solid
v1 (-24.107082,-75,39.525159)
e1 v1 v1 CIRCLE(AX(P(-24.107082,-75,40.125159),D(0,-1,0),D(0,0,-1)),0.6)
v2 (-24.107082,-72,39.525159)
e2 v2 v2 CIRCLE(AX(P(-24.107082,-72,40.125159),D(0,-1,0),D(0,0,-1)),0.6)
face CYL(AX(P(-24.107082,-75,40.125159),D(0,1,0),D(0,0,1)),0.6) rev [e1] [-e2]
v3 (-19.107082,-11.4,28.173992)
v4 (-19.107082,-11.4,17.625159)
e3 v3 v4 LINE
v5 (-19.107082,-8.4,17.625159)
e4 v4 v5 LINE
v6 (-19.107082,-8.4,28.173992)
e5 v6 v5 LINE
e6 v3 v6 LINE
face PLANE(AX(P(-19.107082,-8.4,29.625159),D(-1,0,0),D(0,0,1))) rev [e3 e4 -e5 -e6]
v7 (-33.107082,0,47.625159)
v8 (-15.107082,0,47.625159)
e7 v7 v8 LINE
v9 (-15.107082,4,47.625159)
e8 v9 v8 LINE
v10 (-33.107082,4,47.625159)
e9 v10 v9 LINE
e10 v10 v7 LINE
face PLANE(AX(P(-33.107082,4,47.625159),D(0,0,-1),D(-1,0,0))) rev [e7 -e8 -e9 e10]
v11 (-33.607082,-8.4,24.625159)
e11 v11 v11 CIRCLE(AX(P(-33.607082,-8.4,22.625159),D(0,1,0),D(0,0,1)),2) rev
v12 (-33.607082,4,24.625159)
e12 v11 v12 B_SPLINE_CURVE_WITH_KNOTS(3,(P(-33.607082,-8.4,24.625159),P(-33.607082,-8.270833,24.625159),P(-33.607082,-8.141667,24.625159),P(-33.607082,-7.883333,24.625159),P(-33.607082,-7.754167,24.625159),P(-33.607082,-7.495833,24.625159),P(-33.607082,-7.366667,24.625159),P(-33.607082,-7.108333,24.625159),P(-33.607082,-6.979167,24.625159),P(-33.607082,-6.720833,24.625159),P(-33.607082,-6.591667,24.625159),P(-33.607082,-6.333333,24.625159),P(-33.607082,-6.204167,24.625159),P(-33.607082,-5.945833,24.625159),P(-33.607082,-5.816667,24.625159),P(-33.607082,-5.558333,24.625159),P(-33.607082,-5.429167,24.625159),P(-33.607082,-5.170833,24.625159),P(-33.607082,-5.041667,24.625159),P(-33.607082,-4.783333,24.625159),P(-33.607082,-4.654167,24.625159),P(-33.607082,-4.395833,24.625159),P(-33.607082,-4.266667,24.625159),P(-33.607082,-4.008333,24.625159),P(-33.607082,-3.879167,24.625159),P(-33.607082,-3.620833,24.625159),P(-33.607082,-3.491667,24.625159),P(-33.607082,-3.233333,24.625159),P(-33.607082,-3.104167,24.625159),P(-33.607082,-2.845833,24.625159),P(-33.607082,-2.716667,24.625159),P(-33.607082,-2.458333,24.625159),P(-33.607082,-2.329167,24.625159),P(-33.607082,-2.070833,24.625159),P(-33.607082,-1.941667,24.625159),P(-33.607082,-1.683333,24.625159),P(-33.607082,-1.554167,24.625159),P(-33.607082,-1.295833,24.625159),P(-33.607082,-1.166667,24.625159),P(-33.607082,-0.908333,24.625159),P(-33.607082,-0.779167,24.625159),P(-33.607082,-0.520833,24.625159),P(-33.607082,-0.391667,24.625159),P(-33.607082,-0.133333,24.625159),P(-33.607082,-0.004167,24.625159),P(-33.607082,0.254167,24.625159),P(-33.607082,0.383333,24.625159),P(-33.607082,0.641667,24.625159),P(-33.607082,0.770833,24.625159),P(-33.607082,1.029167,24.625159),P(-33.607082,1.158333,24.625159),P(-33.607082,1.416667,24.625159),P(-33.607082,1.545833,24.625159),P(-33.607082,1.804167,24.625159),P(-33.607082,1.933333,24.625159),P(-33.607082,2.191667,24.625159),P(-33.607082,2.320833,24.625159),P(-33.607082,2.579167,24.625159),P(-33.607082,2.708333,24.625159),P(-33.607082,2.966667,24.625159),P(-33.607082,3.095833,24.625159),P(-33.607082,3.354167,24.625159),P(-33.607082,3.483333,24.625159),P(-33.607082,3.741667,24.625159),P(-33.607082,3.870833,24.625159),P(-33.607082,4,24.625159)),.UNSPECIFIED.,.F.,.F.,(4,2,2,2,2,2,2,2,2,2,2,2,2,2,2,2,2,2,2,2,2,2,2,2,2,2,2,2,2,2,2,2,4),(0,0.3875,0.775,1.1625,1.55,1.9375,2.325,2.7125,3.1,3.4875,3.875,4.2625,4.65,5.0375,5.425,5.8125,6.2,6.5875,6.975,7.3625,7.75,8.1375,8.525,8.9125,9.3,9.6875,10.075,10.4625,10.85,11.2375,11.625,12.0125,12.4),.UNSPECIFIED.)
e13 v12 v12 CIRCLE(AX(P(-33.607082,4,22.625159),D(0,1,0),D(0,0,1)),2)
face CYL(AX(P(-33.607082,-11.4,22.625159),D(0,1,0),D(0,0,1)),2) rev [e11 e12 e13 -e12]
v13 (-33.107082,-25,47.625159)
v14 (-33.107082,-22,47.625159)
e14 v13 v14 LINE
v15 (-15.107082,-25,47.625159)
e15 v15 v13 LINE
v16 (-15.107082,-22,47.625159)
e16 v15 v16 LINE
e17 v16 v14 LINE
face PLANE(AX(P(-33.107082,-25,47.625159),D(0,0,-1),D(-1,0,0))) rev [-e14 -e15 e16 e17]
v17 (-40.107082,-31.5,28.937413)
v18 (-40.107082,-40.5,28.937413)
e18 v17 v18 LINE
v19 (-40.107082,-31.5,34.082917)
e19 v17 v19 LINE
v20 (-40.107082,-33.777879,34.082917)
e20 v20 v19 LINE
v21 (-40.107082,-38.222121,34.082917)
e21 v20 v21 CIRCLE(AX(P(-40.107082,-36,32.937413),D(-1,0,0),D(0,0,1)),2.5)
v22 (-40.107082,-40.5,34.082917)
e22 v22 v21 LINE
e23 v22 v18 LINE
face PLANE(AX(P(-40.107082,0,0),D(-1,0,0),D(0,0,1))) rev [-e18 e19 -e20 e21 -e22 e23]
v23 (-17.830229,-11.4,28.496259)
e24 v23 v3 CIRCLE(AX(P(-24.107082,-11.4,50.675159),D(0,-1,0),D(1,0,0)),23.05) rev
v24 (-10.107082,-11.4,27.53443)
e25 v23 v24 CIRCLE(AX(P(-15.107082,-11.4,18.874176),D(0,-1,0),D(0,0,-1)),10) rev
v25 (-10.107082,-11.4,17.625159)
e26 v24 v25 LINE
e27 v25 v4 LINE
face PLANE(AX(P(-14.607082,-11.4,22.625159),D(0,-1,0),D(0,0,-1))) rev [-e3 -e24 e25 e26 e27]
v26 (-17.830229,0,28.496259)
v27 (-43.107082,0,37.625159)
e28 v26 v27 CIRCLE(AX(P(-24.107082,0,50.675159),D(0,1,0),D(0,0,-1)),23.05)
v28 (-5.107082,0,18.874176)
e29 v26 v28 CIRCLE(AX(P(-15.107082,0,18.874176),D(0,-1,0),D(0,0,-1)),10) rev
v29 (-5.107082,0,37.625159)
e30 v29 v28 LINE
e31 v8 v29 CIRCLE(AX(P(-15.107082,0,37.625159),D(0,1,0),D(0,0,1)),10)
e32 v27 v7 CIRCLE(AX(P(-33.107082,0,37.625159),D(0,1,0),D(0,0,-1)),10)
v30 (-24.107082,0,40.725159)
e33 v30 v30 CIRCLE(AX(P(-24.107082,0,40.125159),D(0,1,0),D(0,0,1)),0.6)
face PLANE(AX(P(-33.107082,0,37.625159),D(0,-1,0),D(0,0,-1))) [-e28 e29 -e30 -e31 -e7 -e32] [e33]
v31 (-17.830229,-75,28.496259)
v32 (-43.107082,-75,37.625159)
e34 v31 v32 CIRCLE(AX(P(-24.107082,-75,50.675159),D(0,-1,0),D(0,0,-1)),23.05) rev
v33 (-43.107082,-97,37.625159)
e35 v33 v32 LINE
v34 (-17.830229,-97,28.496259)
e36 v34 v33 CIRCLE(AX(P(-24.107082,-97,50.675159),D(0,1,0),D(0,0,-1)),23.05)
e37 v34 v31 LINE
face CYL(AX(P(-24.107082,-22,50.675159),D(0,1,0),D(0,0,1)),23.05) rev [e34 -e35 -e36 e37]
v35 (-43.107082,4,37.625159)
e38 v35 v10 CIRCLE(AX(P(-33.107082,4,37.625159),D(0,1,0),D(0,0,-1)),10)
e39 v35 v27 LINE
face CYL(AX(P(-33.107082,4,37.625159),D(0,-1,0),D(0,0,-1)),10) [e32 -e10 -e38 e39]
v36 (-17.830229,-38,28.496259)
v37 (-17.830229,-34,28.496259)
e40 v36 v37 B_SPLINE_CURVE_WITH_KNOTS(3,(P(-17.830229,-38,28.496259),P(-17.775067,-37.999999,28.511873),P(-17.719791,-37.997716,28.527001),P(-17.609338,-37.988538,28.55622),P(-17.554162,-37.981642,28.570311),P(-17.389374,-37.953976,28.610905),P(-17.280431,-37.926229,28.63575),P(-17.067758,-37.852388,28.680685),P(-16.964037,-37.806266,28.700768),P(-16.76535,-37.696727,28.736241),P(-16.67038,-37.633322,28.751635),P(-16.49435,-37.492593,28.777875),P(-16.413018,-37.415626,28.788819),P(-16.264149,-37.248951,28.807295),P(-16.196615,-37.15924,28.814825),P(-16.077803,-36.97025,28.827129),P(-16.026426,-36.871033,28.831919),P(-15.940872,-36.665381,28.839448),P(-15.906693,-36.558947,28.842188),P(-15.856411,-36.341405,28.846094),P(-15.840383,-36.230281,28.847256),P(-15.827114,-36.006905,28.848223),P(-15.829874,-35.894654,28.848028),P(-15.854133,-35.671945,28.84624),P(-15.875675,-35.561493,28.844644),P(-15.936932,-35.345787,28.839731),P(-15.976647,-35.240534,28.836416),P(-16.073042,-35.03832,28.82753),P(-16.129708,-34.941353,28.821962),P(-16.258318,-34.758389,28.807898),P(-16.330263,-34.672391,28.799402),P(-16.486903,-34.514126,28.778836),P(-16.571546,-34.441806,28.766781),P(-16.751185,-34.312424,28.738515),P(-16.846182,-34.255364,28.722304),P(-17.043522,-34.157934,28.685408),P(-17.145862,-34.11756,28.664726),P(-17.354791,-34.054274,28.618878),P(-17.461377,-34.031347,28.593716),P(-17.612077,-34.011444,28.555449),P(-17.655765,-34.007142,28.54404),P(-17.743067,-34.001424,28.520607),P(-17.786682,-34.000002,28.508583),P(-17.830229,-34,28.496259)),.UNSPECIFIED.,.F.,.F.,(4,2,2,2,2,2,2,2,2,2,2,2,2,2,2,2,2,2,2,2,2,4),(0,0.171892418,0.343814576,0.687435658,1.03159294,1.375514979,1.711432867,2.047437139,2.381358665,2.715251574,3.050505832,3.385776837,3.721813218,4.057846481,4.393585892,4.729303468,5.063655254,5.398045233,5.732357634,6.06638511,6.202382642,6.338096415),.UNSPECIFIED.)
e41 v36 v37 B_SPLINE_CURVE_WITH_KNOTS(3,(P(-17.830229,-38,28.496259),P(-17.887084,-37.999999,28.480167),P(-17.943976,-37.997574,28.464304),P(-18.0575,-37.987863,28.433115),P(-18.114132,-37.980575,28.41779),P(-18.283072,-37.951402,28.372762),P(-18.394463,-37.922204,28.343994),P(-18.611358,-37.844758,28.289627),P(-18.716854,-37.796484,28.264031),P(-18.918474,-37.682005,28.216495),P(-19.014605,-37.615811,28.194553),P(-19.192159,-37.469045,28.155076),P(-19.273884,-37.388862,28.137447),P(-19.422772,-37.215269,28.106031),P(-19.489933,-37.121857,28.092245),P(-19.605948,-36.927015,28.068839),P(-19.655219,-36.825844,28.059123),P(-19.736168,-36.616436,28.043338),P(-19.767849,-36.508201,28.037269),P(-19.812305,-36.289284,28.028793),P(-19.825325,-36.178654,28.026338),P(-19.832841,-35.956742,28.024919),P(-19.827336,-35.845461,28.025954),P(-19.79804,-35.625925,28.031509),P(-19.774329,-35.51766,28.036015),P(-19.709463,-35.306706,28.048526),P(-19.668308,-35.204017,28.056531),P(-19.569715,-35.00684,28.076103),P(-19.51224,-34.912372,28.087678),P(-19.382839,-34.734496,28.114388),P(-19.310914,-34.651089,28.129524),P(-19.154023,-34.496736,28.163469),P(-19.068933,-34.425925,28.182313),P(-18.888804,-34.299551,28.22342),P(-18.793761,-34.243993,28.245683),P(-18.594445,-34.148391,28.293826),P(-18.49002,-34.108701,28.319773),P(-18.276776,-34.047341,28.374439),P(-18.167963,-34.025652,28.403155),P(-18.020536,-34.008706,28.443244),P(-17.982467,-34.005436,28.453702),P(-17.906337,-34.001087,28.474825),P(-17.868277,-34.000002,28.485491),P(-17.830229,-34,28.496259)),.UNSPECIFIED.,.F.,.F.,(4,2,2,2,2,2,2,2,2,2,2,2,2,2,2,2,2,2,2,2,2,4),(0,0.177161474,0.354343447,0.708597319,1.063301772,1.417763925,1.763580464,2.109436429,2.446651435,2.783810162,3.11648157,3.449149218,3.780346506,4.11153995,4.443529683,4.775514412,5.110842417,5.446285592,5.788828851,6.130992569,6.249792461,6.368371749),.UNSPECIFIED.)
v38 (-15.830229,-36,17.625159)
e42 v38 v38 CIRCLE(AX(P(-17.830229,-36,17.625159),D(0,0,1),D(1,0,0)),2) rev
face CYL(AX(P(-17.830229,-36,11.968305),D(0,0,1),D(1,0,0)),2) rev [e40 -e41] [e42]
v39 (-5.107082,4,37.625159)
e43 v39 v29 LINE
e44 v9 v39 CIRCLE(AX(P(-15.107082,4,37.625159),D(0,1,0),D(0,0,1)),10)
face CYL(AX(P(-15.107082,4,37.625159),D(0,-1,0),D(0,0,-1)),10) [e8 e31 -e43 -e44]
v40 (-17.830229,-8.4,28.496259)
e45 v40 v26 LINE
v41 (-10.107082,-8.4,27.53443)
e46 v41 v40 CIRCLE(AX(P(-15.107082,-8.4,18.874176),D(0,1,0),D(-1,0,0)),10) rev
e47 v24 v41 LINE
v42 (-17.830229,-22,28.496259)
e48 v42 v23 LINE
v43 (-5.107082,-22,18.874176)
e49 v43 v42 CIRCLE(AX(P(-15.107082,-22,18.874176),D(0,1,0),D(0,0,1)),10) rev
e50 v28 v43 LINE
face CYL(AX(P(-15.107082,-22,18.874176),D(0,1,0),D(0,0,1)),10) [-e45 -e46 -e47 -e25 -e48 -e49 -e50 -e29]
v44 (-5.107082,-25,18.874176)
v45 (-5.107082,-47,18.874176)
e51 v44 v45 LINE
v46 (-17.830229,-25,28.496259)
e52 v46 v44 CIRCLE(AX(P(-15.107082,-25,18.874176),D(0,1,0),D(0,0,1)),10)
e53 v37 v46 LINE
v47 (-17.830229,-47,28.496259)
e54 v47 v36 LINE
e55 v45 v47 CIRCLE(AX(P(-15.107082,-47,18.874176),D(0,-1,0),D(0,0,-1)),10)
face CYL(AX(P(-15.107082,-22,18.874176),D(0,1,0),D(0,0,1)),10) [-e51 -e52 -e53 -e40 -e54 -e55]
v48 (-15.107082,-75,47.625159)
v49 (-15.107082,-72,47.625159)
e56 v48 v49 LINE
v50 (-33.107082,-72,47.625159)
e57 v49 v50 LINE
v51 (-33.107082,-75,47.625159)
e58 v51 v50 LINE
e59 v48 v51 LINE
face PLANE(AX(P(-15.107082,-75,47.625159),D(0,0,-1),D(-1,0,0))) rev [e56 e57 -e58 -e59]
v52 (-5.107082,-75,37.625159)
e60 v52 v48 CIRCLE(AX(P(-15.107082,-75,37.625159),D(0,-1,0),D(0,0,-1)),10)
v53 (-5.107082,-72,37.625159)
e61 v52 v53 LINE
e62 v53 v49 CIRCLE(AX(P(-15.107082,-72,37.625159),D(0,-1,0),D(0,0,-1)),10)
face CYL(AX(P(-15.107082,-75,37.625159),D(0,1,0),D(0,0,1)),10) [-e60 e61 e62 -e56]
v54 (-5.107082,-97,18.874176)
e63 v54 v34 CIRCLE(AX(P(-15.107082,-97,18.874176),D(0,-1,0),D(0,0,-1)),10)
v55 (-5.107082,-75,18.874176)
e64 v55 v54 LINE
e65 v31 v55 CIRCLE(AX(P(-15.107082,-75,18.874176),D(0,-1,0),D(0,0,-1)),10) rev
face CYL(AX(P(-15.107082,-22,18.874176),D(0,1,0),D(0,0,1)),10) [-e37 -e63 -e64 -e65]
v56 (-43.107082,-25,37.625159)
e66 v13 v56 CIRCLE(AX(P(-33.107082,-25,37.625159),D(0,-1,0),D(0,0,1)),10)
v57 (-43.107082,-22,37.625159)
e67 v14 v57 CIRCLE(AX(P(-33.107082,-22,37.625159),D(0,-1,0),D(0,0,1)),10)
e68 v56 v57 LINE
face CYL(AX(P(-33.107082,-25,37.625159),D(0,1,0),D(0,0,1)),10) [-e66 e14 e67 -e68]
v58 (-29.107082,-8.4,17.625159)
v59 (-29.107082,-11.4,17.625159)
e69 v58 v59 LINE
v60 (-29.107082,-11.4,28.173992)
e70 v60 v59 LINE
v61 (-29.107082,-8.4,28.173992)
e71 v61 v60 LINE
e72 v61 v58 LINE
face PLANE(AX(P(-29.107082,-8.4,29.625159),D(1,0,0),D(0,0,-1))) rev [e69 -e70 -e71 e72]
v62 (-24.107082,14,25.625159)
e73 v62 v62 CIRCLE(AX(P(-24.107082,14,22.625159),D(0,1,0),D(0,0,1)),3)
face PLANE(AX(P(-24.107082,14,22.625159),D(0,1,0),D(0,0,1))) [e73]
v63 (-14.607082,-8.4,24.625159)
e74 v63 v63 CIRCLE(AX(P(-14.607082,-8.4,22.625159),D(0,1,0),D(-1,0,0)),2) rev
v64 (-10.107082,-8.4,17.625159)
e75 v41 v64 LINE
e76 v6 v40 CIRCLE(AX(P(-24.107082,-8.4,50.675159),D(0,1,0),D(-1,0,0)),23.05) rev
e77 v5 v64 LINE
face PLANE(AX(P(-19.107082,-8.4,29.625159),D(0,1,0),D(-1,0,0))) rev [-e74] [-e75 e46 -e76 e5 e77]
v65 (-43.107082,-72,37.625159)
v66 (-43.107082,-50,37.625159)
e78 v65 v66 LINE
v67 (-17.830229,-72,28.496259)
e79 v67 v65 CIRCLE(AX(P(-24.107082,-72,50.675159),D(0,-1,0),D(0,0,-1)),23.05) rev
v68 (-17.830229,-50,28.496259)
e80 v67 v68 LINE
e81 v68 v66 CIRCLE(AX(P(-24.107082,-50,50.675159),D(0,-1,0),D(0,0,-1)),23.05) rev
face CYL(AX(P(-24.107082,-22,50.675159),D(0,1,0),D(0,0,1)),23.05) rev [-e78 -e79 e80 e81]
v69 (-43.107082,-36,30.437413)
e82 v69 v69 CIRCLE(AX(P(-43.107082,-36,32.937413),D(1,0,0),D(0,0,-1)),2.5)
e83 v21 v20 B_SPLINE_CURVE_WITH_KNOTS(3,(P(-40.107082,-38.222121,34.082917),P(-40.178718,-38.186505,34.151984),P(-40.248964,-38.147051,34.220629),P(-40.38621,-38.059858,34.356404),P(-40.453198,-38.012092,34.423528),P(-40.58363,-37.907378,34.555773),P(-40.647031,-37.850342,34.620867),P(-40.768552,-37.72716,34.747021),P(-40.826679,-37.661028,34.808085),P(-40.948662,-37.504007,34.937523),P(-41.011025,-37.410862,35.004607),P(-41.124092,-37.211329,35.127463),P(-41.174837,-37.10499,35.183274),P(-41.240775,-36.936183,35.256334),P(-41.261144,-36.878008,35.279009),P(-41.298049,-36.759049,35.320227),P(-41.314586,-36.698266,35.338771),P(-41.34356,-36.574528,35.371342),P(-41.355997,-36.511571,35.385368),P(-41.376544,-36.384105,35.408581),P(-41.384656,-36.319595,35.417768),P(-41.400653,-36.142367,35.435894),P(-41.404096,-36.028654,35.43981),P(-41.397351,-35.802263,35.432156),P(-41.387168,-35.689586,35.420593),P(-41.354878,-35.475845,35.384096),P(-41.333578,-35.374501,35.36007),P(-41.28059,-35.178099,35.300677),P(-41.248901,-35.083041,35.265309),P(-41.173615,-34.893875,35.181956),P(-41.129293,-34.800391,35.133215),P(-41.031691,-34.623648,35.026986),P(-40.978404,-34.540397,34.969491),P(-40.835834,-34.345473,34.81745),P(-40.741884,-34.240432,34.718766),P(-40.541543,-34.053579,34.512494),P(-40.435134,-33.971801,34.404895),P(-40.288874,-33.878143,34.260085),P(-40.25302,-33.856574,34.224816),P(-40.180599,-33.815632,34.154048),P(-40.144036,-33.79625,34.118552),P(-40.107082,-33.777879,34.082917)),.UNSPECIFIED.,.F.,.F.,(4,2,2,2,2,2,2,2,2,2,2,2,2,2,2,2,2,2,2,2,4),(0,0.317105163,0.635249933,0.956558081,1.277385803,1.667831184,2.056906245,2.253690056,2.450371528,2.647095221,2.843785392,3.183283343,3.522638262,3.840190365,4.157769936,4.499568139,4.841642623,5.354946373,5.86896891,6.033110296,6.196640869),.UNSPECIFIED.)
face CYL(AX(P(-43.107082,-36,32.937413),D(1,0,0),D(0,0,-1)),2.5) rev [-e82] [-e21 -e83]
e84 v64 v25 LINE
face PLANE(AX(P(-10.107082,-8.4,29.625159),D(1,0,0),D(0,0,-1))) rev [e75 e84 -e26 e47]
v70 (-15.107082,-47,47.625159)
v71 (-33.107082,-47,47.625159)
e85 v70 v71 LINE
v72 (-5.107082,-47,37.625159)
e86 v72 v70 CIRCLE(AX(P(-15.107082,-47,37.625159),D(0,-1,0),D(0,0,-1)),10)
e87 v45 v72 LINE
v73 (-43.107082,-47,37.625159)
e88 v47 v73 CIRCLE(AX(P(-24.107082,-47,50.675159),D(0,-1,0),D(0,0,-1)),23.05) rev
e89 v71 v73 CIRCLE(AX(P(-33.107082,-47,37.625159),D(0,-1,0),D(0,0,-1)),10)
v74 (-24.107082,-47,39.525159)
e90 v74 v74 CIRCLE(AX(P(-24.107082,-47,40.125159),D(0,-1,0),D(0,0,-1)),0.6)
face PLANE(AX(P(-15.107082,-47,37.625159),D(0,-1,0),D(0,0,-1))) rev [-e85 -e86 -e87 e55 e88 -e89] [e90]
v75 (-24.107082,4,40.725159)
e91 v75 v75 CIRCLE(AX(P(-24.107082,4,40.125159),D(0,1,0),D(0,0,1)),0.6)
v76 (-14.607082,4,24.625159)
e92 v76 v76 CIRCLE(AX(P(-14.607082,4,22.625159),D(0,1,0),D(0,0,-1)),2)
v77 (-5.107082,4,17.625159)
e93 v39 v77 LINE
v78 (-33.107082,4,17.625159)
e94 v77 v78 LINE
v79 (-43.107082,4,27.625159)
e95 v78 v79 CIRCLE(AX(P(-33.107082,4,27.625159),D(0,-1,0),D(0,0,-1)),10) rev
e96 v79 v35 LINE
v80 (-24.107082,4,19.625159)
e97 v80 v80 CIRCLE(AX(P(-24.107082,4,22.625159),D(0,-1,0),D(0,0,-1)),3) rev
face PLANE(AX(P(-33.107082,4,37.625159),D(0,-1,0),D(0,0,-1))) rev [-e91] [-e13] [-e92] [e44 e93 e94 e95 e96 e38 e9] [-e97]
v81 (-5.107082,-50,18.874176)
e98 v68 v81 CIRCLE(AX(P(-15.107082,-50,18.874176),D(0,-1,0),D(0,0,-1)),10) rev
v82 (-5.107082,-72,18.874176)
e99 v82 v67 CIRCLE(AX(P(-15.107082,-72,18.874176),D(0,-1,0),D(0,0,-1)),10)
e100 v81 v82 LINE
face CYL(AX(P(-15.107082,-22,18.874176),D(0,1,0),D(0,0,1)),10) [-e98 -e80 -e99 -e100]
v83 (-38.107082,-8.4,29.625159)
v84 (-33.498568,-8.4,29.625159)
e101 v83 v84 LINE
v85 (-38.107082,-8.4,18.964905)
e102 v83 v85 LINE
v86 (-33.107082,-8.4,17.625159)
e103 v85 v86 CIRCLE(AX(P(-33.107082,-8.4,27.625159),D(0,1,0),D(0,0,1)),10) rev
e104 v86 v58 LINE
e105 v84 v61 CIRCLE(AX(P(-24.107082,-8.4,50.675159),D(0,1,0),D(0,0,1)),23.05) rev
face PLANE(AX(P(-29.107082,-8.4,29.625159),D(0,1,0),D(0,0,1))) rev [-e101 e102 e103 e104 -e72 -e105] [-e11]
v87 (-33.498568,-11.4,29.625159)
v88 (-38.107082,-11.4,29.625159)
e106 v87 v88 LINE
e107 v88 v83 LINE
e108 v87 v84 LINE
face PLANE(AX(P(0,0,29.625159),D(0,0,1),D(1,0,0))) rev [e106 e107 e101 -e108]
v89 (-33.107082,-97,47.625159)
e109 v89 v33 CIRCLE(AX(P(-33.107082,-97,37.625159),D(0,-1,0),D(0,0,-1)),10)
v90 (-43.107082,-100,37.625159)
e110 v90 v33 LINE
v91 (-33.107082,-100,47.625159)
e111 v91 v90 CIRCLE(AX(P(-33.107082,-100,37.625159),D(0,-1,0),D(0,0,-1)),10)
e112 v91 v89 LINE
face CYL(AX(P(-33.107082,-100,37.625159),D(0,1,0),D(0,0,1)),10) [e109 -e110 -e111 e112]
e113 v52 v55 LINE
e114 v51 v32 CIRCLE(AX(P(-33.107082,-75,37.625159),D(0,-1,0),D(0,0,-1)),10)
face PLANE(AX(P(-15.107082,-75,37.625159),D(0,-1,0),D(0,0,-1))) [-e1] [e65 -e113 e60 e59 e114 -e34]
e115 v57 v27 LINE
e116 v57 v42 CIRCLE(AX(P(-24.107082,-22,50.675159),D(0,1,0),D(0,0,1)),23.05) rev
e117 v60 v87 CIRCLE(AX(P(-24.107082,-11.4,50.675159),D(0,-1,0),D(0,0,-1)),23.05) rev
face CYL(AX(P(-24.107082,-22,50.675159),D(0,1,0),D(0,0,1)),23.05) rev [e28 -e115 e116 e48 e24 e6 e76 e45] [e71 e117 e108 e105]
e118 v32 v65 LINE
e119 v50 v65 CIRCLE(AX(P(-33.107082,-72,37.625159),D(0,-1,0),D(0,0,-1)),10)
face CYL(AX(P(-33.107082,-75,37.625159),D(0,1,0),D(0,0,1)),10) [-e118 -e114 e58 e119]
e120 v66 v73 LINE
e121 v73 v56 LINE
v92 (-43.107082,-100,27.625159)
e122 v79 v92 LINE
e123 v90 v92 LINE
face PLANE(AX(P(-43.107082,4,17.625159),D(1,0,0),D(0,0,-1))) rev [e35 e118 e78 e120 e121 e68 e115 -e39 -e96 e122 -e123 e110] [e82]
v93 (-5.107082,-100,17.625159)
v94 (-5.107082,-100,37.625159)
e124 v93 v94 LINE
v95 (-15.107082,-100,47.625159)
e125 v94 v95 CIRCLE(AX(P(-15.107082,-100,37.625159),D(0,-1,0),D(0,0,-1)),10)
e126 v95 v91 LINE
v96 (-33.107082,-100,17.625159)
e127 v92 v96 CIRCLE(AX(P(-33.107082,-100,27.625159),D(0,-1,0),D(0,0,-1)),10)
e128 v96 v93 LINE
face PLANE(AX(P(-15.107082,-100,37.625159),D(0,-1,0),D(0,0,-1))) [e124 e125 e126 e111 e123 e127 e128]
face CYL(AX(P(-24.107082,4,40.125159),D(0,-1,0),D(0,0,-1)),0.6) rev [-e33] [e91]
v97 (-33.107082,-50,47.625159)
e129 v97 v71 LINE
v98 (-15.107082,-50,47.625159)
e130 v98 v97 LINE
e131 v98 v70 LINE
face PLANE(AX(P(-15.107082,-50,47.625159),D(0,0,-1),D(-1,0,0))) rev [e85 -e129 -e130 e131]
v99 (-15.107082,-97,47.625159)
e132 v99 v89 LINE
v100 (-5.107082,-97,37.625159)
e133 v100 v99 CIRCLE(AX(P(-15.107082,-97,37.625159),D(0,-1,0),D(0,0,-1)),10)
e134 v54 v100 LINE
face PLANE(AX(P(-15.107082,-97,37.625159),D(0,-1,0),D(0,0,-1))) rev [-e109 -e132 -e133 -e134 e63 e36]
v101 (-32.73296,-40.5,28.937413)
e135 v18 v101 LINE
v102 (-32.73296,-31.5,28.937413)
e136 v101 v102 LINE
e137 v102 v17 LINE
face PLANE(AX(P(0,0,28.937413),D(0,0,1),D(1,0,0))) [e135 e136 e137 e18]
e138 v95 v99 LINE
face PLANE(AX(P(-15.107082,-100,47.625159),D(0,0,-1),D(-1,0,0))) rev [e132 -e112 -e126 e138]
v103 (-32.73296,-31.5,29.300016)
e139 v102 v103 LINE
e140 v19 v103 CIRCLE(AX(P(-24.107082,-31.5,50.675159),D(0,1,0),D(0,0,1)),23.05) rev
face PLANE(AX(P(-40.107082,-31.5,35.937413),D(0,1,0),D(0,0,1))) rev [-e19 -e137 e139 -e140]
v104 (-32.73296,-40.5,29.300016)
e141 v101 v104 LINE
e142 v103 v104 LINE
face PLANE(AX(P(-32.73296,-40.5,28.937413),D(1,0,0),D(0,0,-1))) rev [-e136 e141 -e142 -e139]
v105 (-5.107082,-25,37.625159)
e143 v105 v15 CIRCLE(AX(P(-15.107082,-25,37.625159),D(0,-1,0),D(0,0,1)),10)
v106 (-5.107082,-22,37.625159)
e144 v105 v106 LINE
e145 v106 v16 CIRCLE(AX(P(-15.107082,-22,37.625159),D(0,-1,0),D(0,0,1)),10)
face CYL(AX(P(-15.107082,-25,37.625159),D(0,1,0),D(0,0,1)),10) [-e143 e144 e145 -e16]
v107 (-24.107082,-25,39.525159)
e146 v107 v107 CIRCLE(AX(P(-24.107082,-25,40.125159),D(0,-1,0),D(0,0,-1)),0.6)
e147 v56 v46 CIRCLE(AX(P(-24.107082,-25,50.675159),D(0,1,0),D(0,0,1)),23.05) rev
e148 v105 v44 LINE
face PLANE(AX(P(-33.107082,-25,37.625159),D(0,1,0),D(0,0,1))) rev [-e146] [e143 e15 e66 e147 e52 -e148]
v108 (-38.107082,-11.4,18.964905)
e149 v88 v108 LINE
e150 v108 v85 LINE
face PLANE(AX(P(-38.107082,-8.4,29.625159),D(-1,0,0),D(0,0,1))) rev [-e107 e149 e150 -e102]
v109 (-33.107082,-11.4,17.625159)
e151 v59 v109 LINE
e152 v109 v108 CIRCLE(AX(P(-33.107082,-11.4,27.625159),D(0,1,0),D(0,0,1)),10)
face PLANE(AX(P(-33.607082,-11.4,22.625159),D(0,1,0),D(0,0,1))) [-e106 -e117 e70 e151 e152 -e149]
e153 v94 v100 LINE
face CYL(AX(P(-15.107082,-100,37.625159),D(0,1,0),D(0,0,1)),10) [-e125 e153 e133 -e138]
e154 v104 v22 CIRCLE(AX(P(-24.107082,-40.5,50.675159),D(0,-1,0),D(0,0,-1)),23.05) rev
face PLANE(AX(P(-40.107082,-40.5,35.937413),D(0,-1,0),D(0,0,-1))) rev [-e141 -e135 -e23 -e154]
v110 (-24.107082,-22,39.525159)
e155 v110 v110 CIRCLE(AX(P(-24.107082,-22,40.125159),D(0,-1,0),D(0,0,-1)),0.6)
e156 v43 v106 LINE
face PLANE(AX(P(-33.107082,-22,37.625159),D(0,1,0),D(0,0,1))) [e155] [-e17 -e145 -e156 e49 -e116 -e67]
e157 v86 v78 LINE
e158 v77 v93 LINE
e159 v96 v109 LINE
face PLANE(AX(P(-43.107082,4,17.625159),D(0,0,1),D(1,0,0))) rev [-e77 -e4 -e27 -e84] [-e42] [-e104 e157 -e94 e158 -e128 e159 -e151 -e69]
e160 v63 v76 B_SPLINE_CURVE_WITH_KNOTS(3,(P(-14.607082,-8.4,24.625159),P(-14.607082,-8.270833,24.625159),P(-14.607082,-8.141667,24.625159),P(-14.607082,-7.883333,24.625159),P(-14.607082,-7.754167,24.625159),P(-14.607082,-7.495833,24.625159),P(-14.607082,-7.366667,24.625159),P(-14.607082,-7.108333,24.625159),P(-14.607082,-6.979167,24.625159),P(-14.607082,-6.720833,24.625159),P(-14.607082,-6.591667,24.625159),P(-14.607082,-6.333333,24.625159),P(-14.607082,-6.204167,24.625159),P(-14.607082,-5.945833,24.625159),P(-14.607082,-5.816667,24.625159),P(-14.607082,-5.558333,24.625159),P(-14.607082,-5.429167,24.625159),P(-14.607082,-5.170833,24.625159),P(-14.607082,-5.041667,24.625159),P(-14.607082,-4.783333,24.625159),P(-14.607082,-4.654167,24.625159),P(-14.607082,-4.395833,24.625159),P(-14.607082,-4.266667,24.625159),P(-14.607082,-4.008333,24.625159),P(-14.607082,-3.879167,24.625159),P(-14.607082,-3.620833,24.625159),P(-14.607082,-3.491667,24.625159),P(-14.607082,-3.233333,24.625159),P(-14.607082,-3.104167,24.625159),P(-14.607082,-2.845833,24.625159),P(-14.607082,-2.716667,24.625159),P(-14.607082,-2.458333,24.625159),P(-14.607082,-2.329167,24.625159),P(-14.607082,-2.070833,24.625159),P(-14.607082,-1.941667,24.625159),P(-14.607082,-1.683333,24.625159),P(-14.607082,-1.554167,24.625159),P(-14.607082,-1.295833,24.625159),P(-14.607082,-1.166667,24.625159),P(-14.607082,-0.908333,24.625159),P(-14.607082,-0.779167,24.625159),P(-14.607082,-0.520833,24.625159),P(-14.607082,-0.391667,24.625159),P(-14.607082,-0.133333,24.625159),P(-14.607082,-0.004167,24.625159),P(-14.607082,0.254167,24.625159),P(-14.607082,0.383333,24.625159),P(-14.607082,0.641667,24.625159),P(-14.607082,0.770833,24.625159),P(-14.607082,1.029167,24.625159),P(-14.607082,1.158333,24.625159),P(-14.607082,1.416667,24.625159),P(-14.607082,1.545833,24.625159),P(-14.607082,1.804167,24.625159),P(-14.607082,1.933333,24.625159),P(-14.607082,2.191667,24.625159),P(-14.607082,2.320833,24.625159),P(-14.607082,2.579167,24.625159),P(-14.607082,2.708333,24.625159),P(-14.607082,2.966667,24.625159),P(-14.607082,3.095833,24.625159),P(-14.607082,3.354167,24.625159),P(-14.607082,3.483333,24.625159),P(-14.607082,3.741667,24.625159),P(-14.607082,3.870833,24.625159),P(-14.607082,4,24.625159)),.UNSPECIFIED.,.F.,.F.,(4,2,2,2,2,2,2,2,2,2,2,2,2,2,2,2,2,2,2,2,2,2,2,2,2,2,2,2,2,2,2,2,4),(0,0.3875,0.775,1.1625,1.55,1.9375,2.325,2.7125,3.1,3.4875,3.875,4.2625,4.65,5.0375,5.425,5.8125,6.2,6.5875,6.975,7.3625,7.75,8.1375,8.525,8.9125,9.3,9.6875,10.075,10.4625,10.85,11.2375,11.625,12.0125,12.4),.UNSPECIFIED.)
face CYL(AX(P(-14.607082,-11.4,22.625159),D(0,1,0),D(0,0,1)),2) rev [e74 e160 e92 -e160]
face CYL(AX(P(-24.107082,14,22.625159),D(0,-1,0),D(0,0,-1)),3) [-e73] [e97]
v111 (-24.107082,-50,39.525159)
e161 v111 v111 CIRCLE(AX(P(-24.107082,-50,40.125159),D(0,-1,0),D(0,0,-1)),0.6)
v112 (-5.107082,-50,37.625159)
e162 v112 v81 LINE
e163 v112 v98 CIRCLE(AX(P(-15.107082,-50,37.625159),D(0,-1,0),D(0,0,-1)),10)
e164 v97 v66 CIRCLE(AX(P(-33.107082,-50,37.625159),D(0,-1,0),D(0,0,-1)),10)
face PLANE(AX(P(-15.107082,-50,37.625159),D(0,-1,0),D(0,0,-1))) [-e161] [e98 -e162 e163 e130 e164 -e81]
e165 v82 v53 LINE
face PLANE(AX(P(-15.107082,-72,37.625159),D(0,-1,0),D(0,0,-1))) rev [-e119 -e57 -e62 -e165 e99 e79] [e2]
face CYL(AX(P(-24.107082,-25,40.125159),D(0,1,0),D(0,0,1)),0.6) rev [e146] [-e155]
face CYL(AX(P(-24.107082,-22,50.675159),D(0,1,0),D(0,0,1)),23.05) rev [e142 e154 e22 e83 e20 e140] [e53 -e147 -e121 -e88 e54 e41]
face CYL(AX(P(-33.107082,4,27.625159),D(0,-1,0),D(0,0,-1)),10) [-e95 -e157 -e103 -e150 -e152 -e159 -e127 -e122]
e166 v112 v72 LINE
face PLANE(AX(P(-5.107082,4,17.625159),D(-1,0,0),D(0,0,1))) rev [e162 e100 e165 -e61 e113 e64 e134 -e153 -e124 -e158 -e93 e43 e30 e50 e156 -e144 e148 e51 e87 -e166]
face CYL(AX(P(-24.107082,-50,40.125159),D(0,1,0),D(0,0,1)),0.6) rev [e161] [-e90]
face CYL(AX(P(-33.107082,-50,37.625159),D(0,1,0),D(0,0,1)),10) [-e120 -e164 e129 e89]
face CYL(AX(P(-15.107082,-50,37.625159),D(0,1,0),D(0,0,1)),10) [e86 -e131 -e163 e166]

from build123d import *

# Parameters (mm, degrees)
CROQUIS2_R               = 0.6
SALIENTE_EXTRUIR1_DEPTH  = 4
SALIENTE_EXTRUIR2_DEPTH  = 22
CROQUIS4_R               = 2
CORTAR_EXTRUIR1_DEPTH    = 15.4
CROQUIS5_W               = 9
CROQUIS5_H               = 3
CORTAR_EXTRUIR2_DEPTH    = 12
SALIENTE_EXTRUIR4_DEPTH  = 25
SALIENTE_EXTRUIR5_START  = 3
CROQUIS6_R               = 0.6
SALIENTE_EXTRUIR5_DEPTH  = 3
SALIENTE_EXTRUIR10_DEPTH = 25
SALIENTE_EXTRUIR11_START = 3
CROQUIS17_R              = 0.6
SALIENTE_EXTRUIR11_DEPTH = 3
SALIENTE_EXTRUIR12_DEPTH = 25
SALIENTE_EXTRUIR13_START = 3
CROQUIS18_R              = 0.6
SALIENTE_EXTRUIR13_DEPTH = 3
SALIENTE_EXTRUIR14_START = 3
SALIENTE_EXTRUIR14_DEPTH = 3
REDONDEO1_R              = 10
REDONDEO2_R              = 10
CROQUIS22_R              = 3
SALIENTE_EXTRUIR15_DEPTH = 10
CROQUIS25_W              = 6
CROQUIS25_H              = 9
CORTAR_EXTRUIR3_DEPTH    = 35
CROQUIS26_R              = 2.5
CORTAR_EXTRUIR4_DEPTH    = 3
CROQUIS27_W              = 7.374121946
CROQUIS27_H              = 9
CORTAR_EXTRUIR5_DEPTH    = 1
CROQUIS29_R              = 2
CORTAR_EXTRUIR6_DEPTH    = 11.312254328


with BuildPart() as part:
    # Croquis2 → Saliente-Extruir1 (new body)
    with BuildSketch(Plane(origin=(0, 0, 0), x_dir=(1, 0, 0), z_dir=(0, 1, 0))):
        with BuildLine():
            Line((-43.107082341, -17.625158928), (-5.107082341, -17.625158928))
            Line((-5.107082341, -17.625158928), (-5.107082341, -37.625158928))
            ThreePointArc((-5.107082341, -37.625158928), (-8.036014529, -44.69622674), (-15.107082341, -47.625158928))
            Line((-15.107082341, -47.625158928), (-33.107082341, -47.625158928))
            ThreePointArc((-33.107082341, -47.625158928), (-40.178150153, -44.69622674), (-43.107082341, -37.625158928))
            Line((-43.107082341, -37.625158928), (-43.107082341, -17.625158928))
        make_face()
        with Locations(Location((-24.107082341, -40.125158928, 0), (0, 0, 270))):
            Circle(CROQUIS2_R, mode=Mode.SUBTRACT)
    extrude(amount=SALIENTE_EXTRUIR1_DEPTH)

    # Croquis3 → Saliente-Extruir2 (add)
    with BuildSketch(Plane.XZ):
        with BuildLine():
            Line((-43.107082341, 17.625158928), (-5.107082341, 17.625158928))
            Line((-5.107082341, 17.625158928), (-5.107082341, 37.625158928))
            ThreePointArc((-5.107082341, 37.625158928), (-24.107082341, 27.625158928), (-43.107082341, 37.625158928))
            Line((-43.107082341, 37.625158928), (-43.107082341, 17.625158928))
        make_face()
    extrude(amount=SALIENTE_EXTRUIR2_DEPTH)

    # Croquis4 → Cortar-Extruir1 (cut)
    with BuildSketch(Plane(origin=(0, 4, 0), x_dir=(1, 0, 0), z_dir=(0, 1, 0))):
        with Locations(Location((-33.607082341, -22.625158928, 0), (0, 0, 270))):
            Circle(CROQUIS4_R)
        with Locations(Location((-14.607082341, -22.625158928, 0), (0, 0, 270))):
            Circle(CROQUIS4_R)
    extrude(amount=-CORTAR_EXTRUIR1_DEPTH, mode=Mode.SUBTRACT)

    # Croquis5 → Cortar-Extruir2 (cut)
    with BuildSketch(Plane(origin=(0, 0, 17.625158928), x_dir=(-1, 0, 0), z_dir=(0, 0, -1))):
        with Locations((33.607082341, -9.9)):
            Rectangle(CROQUIS5_W, CROQUIS5_H)
        with Locations((14.607082341, -9.9)):
            Rectangle(CROQUIS5_W, CROQUIS5_H)
    extrude(amount=-CORTAR_EXTRUIR2_DEPTH, mode=Mode.SUBTRACT)

    # Croquis9 → Saliente-Extruir4 (add)
    with BuildSketch(Plane.XZ.offset(22)):
        with BuildLine():
            Line((-43.107082341, 37.625158928), (-43.107082341, 17.625158928))
            Line((-43.107082341, 17.625158928), (-5.107082341, 17.625158928))
            Line((-5.107082341, 17.625158928), (-5.107082341, 37.625158928))
            ThreePointArc((-5.107082341, 37.625158928), (-24.107082341, 27.625158928), (-43.107082341, 37.625158928))
        make_face()
    extrude(amount=SALIENTE_EXTRUIR4_DEPTH)

    # Croquis6 → Saliente-Extruir5 (add)
    with BuildSketch(Plane.XZ.offset(22).offset(SALIENTE_EXTRUIR5_START)):
        with BuildLine():
            Line((-43.107082341, 17.625158928), (-5.107082341, 17.625158928))
            Line((-5.107082341, 17.625158928), (-5.107082341, 37.625158928))
            ThreePointArc((-5.107082341, 37.625158928), (-8.036014529, 44.69622674), (-15.107082341, 47.625158928))
            Line((-15.107082341, 47.625158928), (-33.107082341, 47.625158928))
            ThreePointArc((-33.107082341, 47.625158928), (-40.178150153, 44.69622674), (-43.107082341, 37.625158928))
            Line((-43.107082341, 37.625158928), (-43.107082341, 17.625158928))
        make_face()
        with Locations(Location((-24.107082341, 40.125158928, 0), (0, 0, 90))):
            Circle(CROQUIS6_R, mode=Mode.SUBTRACT)
    extrude(amount=-SALIENTE_EXTRUIR5_DEPTH)

    # Croquis16 → Saliente-Extruir10 (add)
    with BuildSketch(Plane.XZ.offset(47)):
        with BuildLine():
            Line((-43.107082341, 37.625158928), (-43.107082341, 17.625158928))
            Line((-43.107082341, 17.625158928), (-5.107082341, 17.625158928))
            Line((-5.107082341, 17.625158928), (-5.107082341, 37.625158928))
            ThreePointArc((-5.107082341, 37.625158928), (-24.107082341, 27.625158928), (-43.107082341, 37.625158928))
        make_face()
    extrude(amount=SALIENTE_EXTRUIR10_DEPTH)

    # Croquis17 → Saliente-Extruir11 (add)
    with BuildSketch(Plane.XZ.offset(47).offset(SALIENTE_EXTRUIR11_START)):
        with BuildLine():
            Line((-43.107082341, 17.625158928), (-5.107082341, 17.625158928))
            Line((-5.107082341, 17.625158928), (-5.107082341, 37.625158928))
            ThreePointArc((-5.107082341, 37.625158928), (-8.036014529, 44.69622674), (-15.107082341, 47.625158928))
            Line((-15.107082341, 47.625158928), (-33.107082341, 47.625158928))
            ThreePointArc((-33.107082341, 47.625158928), (-40.178150153, 44.69622674), (-43.107082341, 37.625158928))
            Line((-43.107082341, 37.625158928), (-43.107082341, 17.625158928))
        make_face()
        with Locations(Location((-24.107082341, 40.125158928, 0), (0, 0, 90))):
            Circle(CROQUIS17_R, mode=Mode.SUBTRACT)
    extrude(amount=-SALIENTE_EXTRUIR11_DEPTH)

    # Croquis20 → Saliente-Extruir12 (add)
    with BuildSketch(Plane.XZ.offset(72)):
        with BuildLine():
            Line((-43.107082341, 37.625158928), (-43.107082341, 17.625158928))
            Line((-43.107082341, 17.625158928), (-5.107082341, 17.625158928))
            Line((-5.107082341, 17.625158928), (-5.107082341, 37.625158928))
            ThreePointArc((-5.107082341, 37.625158928), (-24.107082341, 27.625158928), (-43.107082341, 37.625158928))
        make_face()
    extrude(amount=SALIENTE_EXTRUIR12_DEPTH)

    # Croquis18 → Saliente-Extruir13 (add)
    with BuildSketch(Plane.XZ.offset(72).offset(SALIENTE_EXTRUIR13_START)):
        with BuildLine():
            Line((-43.107082341, 17.625158928), (-5.107082341, 17.625158928))
            Line((-5.107082341, 17.625158928), (-5.107082341, 37.625158928))
            ThreePointArc((-5.107082341, 37.625158928), (-8.036014529, 44.69622674), (-15.107082341, 47.625158928))
            Line((-15.107082341, 47.625158928), (-33.107082341, 47.625158928))
            ThreePointArc((-33.107082341, 47.625158928), (-40.178150153, 44.69622674), (-43.107082341, 37.625158928))
            Line((-43.107082341, 37.625158928), (-43.107082341, 17.625158928))
        make_face()
        with Locations(Location((-24.107082341, 40.125158928, 0), (0, 0, 90))):
            Circle(CROQUIS18_R, mode=Mode.SUBTRACT)
    extrude(amount=-SALIENTE_EXTRUIR13_DEPTH)

    # Croquis21 → Saliente-Extruir14 (add)
    with BuildSketch(Plane.XZ.offset(97).offset(SALIENTE_EXTRUIR14_START)):
        with BuildLine():
            Line((-43.107082341, 17.625158928), (-5.107082341, 17.625158928))
            Line((-5.107082341, 17.625158928), (-5.107082341, 37.625158928))
            ThreePointArc((-5.107082341, 37.625158928), (-8.036014529, 44.69622674), (-15.107082341, 47.625158928))
            Line((-15.107082341, 47.625158928), (-33.107082341, 47.625158928))
            ThreePointArc((-33.107082341, 47.625158928), (-40.178150153, 44.69622674), (-43.107082341, 37.625158928))
            Line((-43.107082341, 37.625158928), (-43.107082341, 17.625158928))
        make_face()
    extrude(amount=-SALIENTE_EXTRUIR14_DEPTH)

    # Redondeo1
    # the kernel refuses this fillet: 10 mm, written as the material it takes off along each edge
    with BuildSketch(Plane(origin=(-5.107082341, -28.122543277, 37.625158928), x_dir=(-0.8124951373534511, 0, -0.5829679680539889), z_dir=(0, -1, 0))) as redondeo1_piece_1_section:
        with BuildLine():
            CenterArc((19.056173651, 9.405402575), REDONDEO1_R, 144.340434386, 105.802050026)
            Line((10.931222277, 15.235082256), (0, 0))
            ThreePointArc((0, 0), (7.829675627, 1.370547065), (15.659351253, 0))
        make_face()
    redondeo1_piece_1 = extrude(amount=115.754913446, mode=Mode.PRIVATE)
    redondeo1_piece_1 = split(redondeo1_piece_1, bisect_by=Plane(origin=(-9.572700752, -47, 31.607563131), z_dir=(0, 1, 0)), keep=Keep.TOP, mode=Mode.PRIVATE)
    add(redondeo1_piece_1, mode=Mode.SUBTRACT)
    with BuildSketch(Plane(origin=(-5.107082341, -28.122543277, 37.625158928), x_dir=(-0.8124951373534511, 0, -0.5829679680539889), z_dir=(0, -1, 0))) as redondeo1_piece_2_section:
        with BuildLine():
            CenterArc((19.056173651, 9.405402575), REDONDEO1_R, 144.340434386, 105.802050026)
            Line((10.931222277, 15.235082256), (0, 0))
            ThreePointArc((0, 0), (7.829675627, 1.370547065), (15.659351253, 0))
        make_face()
    redondeo1_piece_2 = extrude(amount=115.754913446, mode=Mode.PRIVATE)
    redondeo1_piece_2 = split(redondeo1_piece_2, bisect_by=Plane(origin=(-9.572700752, -50, 31.607563131), z_dir=(0, -1, 0)), keep=Keep.TOP, mode=Mode.PRIVATE)
    redondeo1_piece_2 = split(redondeo1_piece_2, bisect_by=Plane(origin=(-9.572700752, -72, 31.607563131), z_dir=(0, 1, 0)), keep=Keep.TOP, mode=Mode.PRIVATE)
    add(redondeo1_piece_2, mode=Mode.SUBTRACT)
    with BuildSketch(Plane(origin=(-5.107082341, -75, 37.625158928), x_dir=(-0.8124951373534507, 0, -0.5829679680539895), z_dir=(0, -1, 0)), Plane(origin=(-5.107082341, -50, 37.625158928), x_dir=(-0.8124951373534507, 0, -0.5829679680539895), z_dir=(0, -1, 0)), Plane(origin=(-5.107082341, 0, 37.625158928), x_dir=(-0.8124951373534509, 0, -0.582967968053989), z_dir=(0, -1, 0))) as redondeo1_piece_3:
        with BuildLine():
            CenterArc((19.056173651, 9.405402575), REDONDEO1_R, 144.340434386, 105.802050026)
            Line((10.931222277, 15.235082256), (0, 0))
            ThreePointArc((0, 0), (7.829675627, 1.370547065), (15.659351253, 0))
        make_face()
    extrude(amount=22, mode=Mode.SUBTRACT)
    with BuildSketch(Plane(origin=(-5.107082341, -3.122543277, 37.625158928), x_dir=(-0.8124951373534511, 0, -0.5829679680539889), z_dir=(0, -1, 0))) as redondeo1_piece_4_section:
        with BuildLine():
            CenterArc((19.056173651, 9.405402575), REDONDEO1_R, 144.340434386, 105.802050026)
            Line((10.931222277, 15.235082256), (0, 0))
            ThreePointArc((0, 0), (7.829675627, 1.370547065), (15.659351253, 0))
        make_face()
    redondeo1_piece_4 = extrude(amount=115.754913446, mode=Mode.PRIVATE)
    redondeo1_piece_4 = split(redondeo1_piece_4, bisect_by=Plane(origin=(-12.770805832, -22, 29.1011401), z_dir=(0, 1, 0)), keep=Keep.TOP, mode=Mode.PRIVATE)
    add(redondeo1_piece_4, mode=Mode.SUBTRACT)
    with BuildSketch(Plane(origin=(-5.107082341, -3.122543277, 37.625158928), x_dir=(-0.8124951373534511, 0, -0.5829679680539889), z_dir=(0, -1, 0))) as redondeo1_piece_5_section:
        with BuildLine():
            CenterArc((19.056173651, 9.405402575), REDONDEO1_R, 144.340434386, 105.802050026)
            Line((10.931222277, 15.235082256), (0, 0))
            ThreePointArc((0, 0), (7.829675627, 1.370547065), (15.659351253, 0))
        make_face()
    redondeo1_piece_5 = extrude(amount=115.754913446, mode=Mode.PRIVATE)
    redondeo1_piece_5 = split(redondeo1_piece_5, bisect_by=Plane(origin=(-12.770805832, -25, 29.1011401), z_dir=(0, -1, 0)), keep=Keep.TOP, mode=Mode.PRIVATE)
    redondeo1_piece_5 = split(redondeo1_piece_5, bisect_by=Plane(origin=(-12.770805832, -47, 29.1011401), z_dir=(0, 1, 0)), keep=Keep.TOP, mode=Mode.PRIVATE)
    add(redondeo1_piece_5, mode=Mode.SUBTRACT)
    with BuildSketch(Plane(origin=(-5.107082341, -3.122543277, 37.625158928), x_dir=(-0.8124951373534511, 0, -0.5829679680539889), z_dir=(0, -1, 0))) as redondeo1_piece_6_section:
        with BuildLine():
            CenterArc((19.056173651, 9.405402575), REDONDEO1_R, 144.340434386, 105.802050026)
            Line((10.931222277, 15.235082256), (0, 0))
            ThreePointArc((0, 0), (7.829675627, 1.370547065), (15.659351253, 0))
        make_face()
    redondeo1_piece_6 = extrude(amount=115.754913446, mode=Mode.PRIVATE)
    redondeo1_piece_6 = split(redondeo1_piece_6, bisect_by=Plane(origin=(-12.770805832, -75, 29.1011401), z_dir=(0, -1, 0)), keep=Keep.TOP, mode=Mode.PRIVATE)
    redondeo1_piece_6 = split(redondeo1_piece_6, bisect_by=Plane(origin=(-12.770805832, -97, 29.1011401), z_dir=(0, 1, 0)), keep=Keep.TOP, mode=Mode.PRIVATE)
    add(redondeo1_piece_6, mode=Mode.SUBTRACT)
    with BuildSketch(Plane(origin=(-5.107082341, 46.877456723, 37.625158928), x_dir=(-0.812495137353451, 0, -0.582967968053989), z_dir=(0, -1, 0))) as redondeo1_piece_7_section:
        with BuildLine():
            CenterArc((19.056173651, 9.405402575), REDONDEO1_R, 144.340434386, 105.802050026)
            Line((10.931222277, 15.235082256), (0, 0))
            ThreePointArc((0, 0), (7.829675627, 1.370547065), (15.659351253, 0))
        make_face()
    redondeo1_piece_7 = extrude(amount=115.754913446, mode=Mode.PRIVATE)
    redondeo1_piece_7 = split(redondeo1_piece_7, bisect_by=Plane(origin=(-12.770805832, -25, 29.1011401), z_dir=(0, -1, 0)), keep=Keep.TOP, mode=Mode.PRIVATE)
    redondeo1_piece_7 = split(redondeo1_piece_7, bisect_by=Plane(origin=(-12.770805832, -47, 29.1011401), z_dir=(0, 1, 0)), keep=Keep.TOP, mode=Mode.PRIVATE)
    add(redondeo1_piece_7, mode=Mode.SUBTRACT)
    with BuildSketch(Plane(origin=(-5.107082341, 46.877456723, 37.625158928), x_dir=(-0.812495137353451, 0, -0.582967968053989), z_dir=(0, -1, 0))) as redondeo1_piece_8_section:
        with BuildLine():
            CenterArc((19.056173651, 9.405402575), REDONDEO1_R, 144.340434386, 105.802050026)
            Line((10.931222277, 15.235082256), (0, 0))
            ThreePointArc((0, 0), (7.829675627, 1.370547065), (15.659351253, 0))
        make_face()
    redondeo1_piece_8 = extrude(amount=115.754913446, mode=Mode.PRIVATE)
    redondeo1_piece_8 = split(redondeo1_piece_8, bisect_by=Plane(origin=(-12.770805832, -50, 29.1011401), z_dir=(0, -1, 0)), keep=Keep.TOP, mode=Mode.PRIVATE)
    add(redondeo1_piece_8, mode=Mode.SUBTRACT)

    # Redondeo2
    # the kernel refuses this fillet: 10 mm, written as the material it takes off along each edge
    with BuildSketch(Plane(origin=(-43.107082341, -125, 17.625158928), x_dir=(1, 0, 0), z_dir=(0, 1, 0))) as redondeo2_piece_1:
        with BuildLine():
            CenterArc((REDONDEO2_R, -REDONDEO2_R), REDONDEO2_R, 90, 90)
            Line((0, -REDONDEO2_R), (0, 0))
            Line((0, 0), (REDONDEO2_R, 0))
        make_face()
    extrude(amount=154, mode=Mode.SUBTRACT)

    # Croquis22 → Saliente-Extruir15 (add)
    with BuildSketch(Plane(origin=(0, 4, 0), x_dir=(1, 0, 0), z_dir=(0, 1, 0))):
        with Locations(Location((-24.107082341, -22.625158928, 0), (0, 0, 90))):
            Circle(CROQUIS22_R)
    extrude(amount=SALIENTE_EXTRUIR15_DEPTH)

    # Croquis25 → Cortar-Extruir3 (cut)
    with BuildSketch(Plane(origin=(-5.107082341, 0, 0), x_dir=(0, 0, -1), z_dir=(1, 0, 0))):
        with Locations((-32.937413255, -36)):
            Rectangle(CROQUIS25_W, CROQUIS25_H)
    extrude(amount=-CORTAR_EXTRUIR3_DEPTH, mode=Mode.SUBTRACT)

    # Croquis26 → Cortar-Extruir4 (cut)
    with BuildSketch(Plane(origin=(-40.107082341, 0, 0), x_dir=(0, 0, -1), z_dir=(1, 0, 0))):
        with Locations((-32.937413255, -36)):
            Circle(CROQUIS26_R)
    extrude(amount=-CORTAR_EXTRUIR4_DEPTH, mode=Mode.SUBTRACT)

    # Croquis27 → Cortar-Extruir5 (cut)
    with BuildSketch(Plane.XY.offset(29.937413255)):
        with Locations((-36.420021368, -36)):
            Rectangle(CROQUIS27_W, CROQUIS27_H)
    extrude(amount=-CORTAR_EXTRUIR5_DEPTH, mode=Mode.SUBTRACT)

    # Croquis29 → Cortar-Extruir6 (cut)
    with BuildSketch(Plane.XY.offset(28.937413255)):
        with Locations((-17.830229088, -36)):
            Circle(CROQUIS29_R)
    extrude(amount=-CORTAR_EXTRUIR6_DEPTH, mode=Mode.SUBTRACT)


solid = part.part
